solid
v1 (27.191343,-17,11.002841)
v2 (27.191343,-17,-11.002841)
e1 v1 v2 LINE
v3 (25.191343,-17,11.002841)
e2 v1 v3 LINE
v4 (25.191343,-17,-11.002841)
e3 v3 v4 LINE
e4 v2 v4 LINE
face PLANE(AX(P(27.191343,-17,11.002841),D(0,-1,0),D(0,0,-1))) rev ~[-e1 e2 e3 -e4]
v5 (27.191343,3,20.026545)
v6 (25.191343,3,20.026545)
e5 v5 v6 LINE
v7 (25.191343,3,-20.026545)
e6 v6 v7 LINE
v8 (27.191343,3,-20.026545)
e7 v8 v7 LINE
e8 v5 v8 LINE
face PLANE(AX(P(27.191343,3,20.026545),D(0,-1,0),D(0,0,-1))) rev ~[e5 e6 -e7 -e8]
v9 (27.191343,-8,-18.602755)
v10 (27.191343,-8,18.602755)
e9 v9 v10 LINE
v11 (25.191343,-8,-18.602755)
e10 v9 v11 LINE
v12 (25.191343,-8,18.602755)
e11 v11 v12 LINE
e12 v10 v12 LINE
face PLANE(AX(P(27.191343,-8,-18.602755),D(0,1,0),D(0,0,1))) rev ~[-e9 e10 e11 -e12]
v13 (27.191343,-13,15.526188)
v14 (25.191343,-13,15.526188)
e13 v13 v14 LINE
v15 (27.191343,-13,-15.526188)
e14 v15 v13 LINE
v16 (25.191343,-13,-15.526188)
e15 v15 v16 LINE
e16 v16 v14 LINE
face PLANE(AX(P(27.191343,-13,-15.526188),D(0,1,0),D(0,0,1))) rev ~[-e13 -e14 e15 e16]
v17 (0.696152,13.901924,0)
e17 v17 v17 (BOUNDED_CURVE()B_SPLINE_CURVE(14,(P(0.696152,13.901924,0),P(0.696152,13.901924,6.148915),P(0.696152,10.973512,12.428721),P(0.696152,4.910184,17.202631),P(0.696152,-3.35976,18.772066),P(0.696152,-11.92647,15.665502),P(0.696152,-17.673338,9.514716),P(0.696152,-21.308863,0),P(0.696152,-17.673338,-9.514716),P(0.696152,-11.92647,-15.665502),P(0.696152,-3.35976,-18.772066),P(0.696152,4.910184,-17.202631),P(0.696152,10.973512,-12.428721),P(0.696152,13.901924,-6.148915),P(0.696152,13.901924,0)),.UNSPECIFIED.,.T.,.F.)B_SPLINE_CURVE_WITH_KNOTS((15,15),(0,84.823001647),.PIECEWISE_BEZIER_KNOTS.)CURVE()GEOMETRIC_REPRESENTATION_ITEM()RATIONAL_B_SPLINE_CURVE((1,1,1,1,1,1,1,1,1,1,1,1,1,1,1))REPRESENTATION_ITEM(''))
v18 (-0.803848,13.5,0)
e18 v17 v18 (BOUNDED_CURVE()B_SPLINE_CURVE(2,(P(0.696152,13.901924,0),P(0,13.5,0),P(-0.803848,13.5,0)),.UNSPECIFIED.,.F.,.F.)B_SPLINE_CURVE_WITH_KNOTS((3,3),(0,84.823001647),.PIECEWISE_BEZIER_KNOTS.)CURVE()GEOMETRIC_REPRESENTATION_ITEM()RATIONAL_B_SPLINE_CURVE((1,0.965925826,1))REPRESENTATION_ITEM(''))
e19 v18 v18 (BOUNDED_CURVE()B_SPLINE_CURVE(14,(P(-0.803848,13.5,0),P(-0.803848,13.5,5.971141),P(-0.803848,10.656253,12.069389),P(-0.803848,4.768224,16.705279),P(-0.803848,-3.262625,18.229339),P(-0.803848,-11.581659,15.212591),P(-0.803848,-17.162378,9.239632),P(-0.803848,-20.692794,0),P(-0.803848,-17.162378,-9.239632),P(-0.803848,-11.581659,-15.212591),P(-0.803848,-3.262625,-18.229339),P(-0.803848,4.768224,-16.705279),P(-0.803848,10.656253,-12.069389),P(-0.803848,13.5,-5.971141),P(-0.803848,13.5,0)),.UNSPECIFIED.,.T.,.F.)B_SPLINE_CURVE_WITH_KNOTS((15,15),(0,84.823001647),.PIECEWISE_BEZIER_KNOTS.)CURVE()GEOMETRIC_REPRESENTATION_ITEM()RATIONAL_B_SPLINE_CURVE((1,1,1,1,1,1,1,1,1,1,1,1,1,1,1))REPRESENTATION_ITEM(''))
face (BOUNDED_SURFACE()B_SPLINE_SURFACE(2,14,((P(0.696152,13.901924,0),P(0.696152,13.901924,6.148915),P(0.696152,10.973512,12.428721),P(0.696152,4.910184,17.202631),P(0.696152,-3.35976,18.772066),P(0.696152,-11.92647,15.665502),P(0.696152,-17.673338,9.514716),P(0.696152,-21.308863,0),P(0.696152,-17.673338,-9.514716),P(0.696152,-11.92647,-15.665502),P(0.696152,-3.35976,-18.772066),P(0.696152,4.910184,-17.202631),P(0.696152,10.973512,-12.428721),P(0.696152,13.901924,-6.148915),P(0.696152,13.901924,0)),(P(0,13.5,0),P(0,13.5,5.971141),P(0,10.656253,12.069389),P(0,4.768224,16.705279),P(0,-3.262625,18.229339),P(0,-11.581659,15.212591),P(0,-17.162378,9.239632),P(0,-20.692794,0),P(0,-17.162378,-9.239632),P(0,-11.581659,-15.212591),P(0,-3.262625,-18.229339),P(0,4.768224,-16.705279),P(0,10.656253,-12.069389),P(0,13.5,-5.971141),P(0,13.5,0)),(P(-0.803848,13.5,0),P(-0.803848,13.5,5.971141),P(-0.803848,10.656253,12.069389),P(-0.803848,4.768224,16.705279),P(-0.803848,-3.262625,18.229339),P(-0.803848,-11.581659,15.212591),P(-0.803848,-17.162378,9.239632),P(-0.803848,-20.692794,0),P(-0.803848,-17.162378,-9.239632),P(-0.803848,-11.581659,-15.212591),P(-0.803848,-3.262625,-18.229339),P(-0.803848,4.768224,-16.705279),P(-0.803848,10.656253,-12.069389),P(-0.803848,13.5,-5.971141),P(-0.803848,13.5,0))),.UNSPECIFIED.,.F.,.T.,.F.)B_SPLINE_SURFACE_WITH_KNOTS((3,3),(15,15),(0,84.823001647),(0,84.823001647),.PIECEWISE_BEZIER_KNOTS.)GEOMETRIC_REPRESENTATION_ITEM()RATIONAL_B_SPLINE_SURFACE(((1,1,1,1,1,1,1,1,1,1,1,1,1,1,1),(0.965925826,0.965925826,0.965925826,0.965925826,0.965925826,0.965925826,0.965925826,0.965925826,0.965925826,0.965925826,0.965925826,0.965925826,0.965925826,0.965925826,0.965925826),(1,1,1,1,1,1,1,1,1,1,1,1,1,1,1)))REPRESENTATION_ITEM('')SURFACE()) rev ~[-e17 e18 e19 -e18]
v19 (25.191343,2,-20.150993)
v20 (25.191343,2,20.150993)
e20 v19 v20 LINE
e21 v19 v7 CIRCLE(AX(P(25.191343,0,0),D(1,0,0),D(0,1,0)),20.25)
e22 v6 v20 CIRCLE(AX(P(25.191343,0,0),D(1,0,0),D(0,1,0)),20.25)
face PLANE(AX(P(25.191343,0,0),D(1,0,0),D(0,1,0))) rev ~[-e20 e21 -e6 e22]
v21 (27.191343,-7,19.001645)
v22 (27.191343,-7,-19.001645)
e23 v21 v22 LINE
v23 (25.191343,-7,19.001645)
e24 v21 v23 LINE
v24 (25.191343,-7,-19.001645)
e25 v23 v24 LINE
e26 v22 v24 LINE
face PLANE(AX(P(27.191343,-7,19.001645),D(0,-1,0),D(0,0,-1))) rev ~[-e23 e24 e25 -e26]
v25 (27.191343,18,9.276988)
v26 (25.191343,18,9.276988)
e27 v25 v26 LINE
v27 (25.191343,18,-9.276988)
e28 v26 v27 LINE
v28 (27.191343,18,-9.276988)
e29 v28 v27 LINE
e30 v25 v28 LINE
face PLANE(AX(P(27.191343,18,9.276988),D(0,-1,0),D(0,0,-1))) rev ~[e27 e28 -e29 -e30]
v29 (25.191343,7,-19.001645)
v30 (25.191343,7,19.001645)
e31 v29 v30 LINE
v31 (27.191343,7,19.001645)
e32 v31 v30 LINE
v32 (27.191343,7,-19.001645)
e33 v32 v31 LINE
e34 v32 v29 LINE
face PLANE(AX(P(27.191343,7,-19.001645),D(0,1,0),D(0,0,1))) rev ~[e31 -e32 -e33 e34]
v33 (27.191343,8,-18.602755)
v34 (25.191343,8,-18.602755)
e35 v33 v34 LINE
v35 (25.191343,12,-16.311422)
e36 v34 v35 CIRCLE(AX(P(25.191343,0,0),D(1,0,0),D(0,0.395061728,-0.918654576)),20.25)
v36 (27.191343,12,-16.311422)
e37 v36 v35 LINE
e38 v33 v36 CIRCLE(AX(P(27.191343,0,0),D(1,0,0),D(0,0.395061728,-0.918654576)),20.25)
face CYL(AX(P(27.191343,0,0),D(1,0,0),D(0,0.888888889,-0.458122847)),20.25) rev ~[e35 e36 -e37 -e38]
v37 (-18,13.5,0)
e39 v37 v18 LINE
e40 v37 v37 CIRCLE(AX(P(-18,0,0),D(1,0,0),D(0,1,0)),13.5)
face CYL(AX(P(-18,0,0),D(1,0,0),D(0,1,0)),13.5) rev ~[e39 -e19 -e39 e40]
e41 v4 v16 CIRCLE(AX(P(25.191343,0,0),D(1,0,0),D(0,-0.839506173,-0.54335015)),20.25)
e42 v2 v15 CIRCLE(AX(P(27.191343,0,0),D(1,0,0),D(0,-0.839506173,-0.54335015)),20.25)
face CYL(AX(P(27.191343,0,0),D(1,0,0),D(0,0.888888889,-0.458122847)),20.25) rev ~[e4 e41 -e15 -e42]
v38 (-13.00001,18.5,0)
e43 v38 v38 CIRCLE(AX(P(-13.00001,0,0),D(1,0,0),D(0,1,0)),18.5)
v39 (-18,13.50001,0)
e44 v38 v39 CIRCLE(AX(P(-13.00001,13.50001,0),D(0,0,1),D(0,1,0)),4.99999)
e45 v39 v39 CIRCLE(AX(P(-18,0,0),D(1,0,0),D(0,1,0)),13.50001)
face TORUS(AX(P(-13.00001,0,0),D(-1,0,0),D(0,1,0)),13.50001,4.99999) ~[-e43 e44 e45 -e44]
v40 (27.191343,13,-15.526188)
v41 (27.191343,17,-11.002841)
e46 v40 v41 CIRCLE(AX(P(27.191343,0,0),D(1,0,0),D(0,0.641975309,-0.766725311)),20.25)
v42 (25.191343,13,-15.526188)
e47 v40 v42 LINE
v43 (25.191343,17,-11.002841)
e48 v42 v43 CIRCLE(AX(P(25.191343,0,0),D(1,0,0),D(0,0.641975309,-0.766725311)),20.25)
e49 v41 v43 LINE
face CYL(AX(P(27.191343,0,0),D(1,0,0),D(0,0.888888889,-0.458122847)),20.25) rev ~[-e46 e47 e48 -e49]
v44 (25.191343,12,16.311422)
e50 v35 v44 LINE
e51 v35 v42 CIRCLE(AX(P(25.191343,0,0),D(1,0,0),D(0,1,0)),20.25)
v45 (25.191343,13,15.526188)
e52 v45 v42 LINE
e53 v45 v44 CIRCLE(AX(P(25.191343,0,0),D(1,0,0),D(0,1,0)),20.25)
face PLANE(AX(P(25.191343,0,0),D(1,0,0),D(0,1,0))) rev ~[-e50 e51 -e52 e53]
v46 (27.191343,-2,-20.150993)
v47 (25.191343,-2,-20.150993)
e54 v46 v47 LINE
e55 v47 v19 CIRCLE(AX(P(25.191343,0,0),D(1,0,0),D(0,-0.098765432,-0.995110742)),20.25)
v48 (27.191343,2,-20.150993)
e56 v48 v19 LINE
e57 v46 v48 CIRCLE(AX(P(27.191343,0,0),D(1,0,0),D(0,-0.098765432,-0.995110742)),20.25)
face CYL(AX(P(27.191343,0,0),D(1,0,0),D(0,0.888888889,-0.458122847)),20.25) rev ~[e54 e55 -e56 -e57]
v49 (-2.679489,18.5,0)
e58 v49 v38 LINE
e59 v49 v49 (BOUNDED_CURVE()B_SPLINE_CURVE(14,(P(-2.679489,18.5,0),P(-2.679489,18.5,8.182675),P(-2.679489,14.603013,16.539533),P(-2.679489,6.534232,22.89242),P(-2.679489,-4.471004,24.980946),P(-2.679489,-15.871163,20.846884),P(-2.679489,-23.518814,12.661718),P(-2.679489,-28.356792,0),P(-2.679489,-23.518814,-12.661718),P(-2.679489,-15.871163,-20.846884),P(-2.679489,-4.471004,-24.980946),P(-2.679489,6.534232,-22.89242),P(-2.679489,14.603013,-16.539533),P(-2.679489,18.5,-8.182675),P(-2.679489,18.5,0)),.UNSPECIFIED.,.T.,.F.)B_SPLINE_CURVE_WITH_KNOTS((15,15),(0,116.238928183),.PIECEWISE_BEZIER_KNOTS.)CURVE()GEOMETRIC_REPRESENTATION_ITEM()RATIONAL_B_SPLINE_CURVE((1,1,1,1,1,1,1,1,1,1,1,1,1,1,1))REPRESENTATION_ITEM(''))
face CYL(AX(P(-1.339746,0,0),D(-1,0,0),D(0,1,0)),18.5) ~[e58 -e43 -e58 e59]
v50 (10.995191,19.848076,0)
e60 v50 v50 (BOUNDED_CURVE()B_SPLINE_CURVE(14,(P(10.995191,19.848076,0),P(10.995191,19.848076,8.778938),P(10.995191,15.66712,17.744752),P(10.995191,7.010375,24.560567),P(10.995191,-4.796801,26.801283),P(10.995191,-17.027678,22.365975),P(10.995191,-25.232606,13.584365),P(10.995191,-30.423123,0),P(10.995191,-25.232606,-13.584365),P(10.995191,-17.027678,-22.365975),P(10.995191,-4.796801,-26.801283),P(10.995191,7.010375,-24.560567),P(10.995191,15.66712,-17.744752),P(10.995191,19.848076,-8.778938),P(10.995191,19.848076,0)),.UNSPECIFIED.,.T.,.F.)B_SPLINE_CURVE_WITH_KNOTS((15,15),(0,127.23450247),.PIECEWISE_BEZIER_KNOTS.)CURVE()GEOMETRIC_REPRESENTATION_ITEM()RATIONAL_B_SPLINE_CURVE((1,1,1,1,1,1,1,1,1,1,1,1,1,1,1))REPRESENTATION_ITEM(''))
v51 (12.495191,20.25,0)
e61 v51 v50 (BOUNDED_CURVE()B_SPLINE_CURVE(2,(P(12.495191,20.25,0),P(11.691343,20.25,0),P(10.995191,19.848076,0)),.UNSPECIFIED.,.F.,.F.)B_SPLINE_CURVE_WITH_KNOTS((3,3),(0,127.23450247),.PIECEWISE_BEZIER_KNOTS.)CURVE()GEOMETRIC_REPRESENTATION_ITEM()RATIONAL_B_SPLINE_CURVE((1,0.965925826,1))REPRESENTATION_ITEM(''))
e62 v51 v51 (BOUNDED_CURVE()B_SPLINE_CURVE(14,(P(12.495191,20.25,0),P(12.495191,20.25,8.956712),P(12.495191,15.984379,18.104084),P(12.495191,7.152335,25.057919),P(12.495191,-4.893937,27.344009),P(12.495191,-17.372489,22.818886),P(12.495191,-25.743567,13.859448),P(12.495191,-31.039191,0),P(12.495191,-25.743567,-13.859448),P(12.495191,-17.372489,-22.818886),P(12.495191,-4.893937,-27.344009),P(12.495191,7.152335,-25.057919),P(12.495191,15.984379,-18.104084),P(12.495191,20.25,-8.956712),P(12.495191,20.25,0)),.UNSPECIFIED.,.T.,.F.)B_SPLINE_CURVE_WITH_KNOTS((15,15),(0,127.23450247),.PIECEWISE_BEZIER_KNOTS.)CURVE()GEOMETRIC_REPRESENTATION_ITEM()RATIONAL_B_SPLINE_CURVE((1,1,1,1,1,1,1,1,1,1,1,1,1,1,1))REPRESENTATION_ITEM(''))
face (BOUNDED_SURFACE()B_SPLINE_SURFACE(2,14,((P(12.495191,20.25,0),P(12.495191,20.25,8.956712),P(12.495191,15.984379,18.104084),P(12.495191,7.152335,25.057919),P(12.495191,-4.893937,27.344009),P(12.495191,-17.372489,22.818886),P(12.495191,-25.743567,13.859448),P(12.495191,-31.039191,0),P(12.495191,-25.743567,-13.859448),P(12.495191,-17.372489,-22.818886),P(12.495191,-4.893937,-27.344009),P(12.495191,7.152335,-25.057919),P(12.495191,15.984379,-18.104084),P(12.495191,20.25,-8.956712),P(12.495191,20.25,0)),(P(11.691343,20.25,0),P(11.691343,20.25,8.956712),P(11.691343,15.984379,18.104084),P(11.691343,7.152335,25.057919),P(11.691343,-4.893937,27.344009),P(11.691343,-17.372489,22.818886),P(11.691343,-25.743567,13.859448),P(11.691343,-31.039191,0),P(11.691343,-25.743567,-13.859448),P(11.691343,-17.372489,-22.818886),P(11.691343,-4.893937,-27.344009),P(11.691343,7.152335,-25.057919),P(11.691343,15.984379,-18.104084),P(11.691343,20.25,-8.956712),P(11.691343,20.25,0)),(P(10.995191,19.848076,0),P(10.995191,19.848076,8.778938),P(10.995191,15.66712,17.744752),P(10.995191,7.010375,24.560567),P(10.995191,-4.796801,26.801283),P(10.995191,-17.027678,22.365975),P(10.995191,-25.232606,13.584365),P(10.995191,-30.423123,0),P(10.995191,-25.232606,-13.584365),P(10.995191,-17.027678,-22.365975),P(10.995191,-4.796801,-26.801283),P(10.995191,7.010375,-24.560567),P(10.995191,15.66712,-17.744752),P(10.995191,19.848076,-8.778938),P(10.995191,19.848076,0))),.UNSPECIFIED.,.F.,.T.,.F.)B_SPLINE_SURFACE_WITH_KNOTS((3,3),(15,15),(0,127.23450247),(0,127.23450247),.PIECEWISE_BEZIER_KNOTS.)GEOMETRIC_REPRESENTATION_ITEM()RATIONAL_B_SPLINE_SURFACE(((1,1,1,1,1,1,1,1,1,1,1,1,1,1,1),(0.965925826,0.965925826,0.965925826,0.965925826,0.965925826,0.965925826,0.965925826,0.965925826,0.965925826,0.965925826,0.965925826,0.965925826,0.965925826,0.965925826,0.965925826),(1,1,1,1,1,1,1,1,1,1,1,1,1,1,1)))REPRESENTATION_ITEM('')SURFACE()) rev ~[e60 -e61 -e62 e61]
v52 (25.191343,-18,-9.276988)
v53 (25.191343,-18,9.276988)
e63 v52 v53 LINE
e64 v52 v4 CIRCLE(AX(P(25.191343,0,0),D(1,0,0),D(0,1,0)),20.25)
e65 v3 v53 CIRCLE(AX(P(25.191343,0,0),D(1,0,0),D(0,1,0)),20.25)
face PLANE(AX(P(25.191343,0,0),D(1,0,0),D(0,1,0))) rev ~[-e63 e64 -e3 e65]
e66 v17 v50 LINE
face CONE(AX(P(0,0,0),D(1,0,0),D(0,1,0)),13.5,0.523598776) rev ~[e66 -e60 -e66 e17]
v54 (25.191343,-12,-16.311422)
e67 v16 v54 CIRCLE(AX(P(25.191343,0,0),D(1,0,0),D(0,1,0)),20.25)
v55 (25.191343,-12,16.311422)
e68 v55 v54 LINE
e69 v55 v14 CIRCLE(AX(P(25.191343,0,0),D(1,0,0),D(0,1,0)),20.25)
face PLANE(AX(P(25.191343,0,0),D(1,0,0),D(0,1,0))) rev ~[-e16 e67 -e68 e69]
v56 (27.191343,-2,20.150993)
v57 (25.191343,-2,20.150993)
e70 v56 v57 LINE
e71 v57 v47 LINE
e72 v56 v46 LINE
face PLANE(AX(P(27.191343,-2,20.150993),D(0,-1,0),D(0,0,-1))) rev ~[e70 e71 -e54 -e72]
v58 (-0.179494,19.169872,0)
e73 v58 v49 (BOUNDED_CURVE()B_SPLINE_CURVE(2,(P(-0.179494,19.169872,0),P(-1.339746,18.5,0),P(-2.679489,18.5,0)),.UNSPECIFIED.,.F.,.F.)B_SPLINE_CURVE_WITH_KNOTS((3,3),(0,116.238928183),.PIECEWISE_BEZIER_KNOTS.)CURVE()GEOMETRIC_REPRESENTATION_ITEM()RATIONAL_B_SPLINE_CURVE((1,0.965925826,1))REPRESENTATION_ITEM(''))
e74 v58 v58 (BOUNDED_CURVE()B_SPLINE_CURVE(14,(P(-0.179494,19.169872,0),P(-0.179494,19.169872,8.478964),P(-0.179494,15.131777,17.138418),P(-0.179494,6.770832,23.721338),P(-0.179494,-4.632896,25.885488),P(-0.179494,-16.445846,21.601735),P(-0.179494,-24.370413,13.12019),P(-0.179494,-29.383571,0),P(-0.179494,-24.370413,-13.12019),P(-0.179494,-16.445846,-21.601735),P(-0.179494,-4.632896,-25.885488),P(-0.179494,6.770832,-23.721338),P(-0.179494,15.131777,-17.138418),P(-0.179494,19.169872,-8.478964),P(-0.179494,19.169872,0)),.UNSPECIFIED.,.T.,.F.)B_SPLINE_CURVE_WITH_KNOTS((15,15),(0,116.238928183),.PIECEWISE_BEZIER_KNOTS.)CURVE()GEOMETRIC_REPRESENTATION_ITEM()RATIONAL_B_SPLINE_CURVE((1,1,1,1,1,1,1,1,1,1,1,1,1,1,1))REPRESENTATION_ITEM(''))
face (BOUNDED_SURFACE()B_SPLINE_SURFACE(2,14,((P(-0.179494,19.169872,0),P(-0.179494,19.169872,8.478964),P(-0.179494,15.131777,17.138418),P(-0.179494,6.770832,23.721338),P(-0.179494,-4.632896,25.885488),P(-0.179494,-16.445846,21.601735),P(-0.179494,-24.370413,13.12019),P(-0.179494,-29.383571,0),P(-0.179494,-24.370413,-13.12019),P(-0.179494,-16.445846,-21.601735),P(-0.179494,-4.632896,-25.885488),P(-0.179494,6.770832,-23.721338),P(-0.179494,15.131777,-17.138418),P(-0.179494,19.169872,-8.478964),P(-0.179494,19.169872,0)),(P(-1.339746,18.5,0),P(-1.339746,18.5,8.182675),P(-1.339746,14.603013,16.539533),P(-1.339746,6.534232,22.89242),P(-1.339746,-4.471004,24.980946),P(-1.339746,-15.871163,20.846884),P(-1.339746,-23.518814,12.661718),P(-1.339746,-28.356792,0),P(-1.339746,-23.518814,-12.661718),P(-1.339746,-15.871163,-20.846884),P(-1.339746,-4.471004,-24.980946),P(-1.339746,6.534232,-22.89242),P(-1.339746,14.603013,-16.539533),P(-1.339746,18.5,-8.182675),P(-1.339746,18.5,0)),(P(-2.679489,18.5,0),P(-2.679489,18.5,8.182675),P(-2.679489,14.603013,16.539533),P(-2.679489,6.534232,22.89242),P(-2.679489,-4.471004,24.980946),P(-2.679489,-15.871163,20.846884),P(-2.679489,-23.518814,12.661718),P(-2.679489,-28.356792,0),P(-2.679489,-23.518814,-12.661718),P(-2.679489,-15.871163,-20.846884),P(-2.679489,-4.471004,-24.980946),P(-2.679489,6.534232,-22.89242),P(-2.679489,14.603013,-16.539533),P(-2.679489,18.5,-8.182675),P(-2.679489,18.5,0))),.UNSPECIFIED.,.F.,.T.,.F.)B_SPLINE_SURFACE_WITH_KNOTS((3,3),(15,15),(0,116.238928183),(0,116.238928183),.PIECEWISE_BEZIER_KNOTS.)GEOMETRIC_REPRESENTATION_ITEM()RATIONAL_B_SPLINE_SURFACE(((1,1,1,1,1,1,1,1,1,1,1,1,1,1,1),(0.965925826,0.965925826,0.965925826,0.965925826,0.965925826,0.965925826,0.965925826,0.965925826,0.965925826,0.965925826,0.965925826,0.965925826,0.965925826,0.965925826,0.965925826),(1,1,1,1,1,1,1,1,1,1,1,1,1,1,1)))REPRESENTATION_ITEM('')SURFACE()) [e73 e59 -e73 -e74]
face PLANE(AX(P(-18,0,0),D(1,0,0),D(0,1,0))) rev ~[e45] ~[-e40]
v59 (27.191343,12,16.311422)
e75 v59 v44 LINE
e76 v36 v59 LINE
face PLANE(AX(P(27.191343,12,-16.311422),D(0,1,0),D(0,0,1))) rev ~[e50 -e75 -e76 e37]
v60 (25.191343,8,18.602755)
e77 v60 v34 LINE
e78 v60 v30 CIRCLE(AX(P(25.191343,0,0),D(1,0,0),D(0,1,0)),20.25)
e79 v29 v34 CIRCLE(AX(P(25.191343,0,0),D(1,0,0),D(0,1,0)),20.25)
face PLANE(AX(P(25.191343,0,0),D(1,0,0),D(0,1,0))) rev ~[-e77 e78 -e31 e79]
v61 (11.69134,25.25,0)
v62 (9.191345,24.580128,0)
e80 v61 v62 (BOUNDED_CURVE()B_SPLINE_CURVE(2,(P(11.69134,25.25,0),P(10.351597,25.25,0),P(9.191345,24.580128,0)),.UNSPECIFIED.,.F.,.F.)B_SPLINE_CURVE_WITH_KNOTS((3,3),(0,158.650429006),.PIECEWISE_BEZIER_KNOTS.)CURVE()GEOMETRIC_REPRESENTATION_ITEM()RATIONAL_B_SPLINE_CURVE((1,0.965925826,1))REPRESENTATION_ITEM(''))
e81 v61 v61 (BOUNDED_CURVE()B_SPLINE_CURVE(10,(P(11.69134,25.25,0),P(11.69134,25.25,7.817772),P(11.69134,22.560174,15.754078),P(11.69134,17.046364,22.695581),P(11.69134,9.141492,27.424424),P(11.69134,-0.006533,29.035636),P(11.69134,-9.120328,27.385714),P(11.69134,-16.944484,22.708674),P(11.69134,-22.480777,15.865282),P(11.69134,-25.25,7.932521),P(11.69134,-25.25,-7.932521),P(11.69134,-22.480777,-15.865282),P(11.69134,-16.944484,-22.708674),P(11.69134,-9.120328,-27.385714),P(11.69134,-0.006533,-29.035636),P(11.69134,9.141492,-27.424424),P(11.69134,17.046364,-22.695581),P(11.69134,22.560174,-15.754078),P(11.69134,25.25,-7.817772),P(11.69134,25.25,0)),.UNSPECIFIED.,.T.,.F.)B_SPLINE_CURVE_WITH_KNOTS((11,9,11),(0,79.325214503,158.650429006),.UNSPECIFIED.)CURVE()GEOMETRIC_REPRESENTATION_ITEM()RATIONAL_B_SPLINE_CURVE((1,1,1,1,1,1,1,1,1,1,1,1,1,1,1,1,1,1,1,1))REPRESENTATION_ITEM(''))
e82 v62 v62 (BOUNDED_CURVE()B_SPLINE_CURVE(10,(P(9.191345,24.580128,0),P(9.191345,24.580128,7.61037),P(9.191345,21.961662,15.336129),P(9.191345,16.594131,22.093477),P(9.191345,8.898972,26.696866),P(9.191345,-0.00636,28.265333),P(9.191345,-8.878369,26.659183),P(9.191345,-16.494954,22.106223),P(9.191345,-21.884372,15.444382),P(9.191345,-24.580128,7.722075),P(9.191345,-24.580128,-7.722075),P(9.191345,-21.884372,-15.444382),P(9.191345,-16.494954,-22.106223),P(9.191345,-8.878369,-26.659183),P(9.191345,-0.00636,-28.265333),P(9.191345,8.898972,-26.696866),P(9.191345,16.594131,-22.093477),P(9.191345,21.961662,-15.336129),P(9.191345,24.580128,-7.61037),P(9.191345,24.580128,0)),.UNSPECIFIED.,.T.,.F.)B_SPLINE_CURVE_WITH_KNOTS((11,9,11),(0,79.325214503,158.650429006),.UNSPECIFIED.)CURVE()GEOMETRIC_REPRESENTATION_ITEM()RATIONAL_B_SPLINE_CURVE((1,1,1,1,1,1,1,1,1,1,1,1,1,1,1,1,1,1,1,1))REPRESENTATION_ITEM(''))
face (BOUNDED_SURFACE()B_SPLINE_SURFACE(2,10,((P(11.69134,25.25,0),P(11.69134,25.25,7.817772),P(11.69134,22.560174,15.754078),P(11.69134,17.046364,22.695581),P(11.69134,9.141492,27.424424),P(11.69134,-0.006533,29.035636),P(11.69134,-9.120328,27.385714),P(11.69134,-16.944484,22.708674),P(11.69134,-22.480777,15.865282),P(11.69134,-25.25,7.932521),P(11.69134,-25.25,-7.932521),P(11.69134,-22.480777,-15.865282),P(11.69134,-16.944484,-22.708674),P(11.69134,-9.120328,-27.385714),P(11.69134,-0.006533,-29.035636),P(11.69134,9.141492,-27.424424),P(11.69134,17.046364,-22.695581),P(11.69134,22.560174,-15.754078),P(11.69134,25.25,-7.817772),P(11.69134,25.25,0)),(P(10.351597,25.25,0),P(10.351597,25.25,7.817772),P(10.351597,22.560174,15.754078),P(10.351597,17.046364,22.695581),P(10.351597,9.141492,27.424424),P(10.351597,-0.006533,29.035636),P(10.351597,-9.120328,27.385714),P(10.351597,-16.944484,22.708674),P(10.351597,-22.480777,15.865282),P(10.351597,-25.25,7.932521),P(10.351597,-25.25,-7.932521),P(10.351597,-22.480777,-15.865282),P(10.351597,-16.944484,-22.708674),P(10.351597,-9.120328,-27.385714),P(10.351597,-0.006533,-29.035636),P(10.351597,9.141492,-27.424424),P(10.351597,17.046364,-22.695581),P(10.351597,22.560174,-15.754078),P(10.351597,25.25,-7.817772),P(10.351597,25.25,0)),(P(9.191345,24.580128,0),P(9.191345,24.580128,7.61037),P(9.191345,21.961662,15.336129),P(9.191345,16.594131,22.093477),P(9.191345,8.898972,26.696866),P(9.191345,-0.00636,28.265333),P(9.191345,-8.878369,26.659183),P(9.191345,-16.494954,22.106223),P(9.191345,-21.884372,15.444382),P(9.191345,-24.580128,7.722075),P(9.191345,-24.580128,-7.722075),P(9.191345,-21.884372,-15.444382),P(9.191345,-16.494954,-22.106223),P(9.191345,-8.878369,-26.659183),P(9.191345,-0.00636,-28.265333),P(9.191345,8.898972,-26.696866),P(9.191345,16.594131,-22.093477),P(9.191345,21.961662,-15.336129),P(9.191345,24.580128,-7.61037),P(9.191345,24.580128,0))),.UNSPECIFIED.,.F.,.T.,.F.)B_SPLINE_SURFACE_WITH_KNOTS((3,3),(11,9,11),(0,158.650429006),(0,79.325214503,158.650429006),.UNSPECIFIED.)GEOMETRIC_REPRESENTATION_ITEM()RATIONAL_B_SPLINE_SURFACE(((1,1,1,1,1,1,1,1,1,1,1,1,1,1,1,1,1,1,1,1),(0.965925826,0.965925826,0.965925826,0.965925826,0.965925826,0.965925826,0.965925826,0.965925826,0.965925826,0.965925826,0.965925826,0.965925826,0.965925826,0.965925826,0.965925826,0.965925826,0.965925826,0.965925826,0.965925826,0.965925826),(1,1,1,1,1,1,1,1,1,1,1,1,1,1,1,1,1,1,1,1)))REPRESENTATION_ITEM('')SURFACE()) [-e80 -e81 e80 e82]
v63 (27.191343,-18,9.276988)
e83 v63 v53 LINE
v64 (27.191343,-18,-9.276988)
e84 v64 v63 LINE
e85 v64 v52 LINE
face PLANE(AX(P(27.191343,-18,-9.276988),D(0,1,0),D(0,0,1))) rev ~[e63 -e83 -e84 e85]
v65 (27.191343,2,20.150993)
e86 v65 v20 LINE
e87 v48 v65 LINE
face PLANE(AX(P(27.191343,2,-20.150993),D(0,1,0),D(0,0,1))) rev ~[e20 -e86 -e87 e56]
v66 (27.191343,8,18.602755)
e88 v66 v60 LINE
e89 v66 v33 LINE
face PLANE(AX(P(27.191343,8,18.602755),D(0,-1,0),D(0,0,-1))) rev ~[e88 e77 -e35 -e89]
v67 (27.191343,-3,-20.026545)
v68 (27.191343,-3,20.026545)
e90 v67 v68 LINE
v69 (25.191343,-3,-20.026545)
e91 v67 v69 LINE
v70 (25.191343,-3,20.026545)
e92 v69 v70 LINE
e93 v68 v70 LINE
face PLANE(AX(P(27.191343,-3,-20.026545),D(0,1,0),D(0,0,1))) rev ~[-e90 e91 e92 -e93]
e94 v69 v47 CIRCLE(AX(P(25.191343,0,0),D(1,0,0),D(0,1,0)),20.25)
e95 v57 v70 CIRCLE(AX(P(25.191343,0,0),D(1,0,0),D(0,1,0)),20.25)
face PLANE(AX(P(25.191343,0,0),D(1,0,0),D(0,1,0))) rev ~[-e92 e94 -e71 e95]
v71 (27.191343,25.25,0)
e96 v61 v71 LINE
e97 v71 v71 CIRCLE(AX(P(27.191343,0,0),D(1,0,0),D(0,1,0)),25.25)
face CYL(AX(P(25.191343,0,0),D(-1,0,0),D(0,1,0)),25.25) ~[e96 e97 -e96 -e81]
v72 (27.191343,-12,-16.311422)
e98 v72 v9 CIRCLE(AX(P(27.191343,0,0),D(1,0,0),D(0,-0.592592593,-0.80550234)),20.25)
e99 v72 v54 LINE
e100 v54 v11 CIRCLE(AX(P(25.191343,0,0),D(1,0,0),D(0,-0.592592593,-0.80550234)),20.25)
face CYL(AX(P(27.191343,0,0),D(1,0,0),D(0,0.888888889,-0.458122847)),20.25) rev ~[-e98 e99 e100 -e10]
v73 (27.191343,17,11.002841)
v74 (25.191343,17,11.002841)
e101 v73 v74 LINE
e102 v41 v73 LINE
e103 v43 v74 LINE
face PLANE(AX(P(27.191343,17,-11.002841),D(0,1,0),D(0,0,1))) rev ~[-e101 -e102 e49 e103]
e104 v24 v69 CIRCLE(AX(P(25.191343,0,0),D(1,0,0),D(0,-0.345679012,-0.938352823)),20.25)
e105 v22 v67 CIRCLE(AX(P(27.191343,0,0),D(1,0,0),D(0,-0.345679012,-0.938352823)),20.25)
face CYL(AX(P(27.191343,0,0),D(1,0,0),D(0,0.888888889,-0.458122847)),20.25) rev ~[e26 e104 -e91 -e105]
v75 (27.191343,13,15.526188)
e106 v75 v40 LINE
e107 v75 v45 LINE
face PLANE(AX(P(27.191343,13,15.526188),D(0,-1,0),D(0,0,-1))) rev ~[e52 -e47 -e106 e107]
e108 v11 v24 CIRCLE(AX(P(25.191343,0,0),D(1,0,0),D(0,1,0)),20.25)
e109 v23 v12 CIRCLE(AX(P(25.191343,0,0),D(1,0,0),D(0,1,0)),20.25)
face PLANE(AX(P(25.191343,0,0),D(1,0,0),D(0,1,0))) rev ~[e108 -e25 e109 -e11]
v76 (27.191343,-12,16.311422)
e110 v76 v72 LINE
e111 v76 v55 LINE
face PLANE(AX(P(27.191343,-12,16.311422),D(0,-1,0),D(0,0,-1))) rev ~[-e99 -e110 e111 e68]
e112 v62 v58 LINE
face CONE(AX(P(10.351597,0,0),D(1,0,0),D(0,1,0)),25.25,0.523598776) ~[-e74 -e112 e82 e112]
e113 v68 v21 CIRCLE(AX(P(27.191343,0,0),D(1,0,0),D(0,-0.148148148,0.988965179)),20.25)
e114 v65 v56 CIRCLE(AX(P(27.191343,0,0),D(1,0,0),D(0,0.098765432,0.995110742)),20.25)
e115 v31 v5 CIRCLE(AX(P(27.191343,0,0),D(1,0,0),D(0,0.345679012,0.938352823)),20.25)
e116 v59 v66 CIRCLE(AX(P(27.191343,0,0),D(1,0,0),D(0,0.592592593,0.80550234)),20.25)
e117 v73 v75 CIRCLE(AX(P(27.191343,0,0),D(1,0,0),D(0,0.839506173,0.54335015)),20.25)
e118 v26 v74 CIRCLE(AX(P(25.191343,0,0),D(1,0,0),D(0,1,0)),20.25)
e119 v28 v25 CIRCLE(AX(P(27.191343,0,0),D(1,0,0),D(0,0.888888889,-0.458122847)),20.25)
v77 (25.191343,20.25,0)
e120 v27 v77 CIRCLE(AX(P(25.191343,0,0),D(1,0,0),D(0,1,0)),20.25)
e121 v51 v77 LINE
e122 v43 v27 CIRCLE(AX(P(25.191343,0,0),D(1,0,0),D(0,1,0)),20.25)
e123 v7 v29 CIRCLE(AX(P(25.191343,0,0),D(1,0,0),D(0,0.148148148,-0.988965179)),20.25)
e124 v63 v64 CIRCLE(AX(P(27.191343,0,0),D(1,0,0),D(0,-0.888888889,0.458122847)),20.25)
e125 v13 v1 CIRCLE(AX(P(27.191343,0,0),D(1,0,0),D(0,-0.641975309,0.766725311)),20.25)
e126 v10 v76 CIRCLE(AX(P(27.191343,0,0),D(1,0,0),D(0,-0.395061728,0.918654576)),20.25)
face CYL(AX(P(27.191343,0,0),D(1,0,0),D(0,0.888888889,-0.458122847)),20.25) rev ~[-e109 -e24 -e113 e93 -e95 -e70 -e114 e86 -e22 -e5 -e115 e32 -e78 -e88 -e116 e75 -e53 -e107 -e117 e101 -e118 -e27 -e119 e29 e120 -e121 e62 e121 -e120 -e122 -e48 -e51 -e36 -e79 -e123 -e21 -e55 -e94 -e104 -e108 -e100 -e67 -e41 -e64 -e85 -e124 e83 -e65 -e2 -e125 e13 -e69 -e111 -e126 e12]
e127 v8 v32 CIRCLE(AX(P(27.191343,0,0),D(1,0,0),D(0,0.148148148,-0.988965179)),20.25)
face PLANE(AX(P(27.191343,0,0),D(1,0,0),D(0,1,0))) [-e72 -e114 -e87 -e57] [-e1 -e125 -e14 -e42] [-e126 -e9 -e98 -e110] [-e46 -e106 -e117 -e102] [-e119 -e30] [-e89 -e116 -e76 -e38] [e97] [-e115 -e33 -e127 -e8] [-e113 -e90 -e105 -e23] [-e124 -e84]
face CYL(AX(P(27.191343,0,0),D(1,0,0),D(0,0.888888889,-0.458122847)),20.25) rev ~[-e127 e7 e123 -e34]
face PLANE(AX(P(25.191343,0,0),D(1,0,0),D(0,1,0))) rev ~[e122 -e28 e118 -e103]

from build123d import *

# Parameters (mm, degrees)
F2_R     = 25.25
F3_DEPTH = 2
F5_DEPTH = 2
F6_R     = 4.99999
F7_R     = 3


# Not quite as in the source:
# - a fillet or chamfer is up to 0.001 mm smaller than in the source, because OpenCascade refuses the exact size
# - a feature names something its author has since deleted; it is built from what else it names


with BuildPart() as f1:
    # F0 (on Top) → F1 (revolve)
    with BuildSketch(Plane.XY):
        Polygon((-18, 18.5), (-18, 13.5), (0, 13.5), (11.6913429511, 20.25), (25.1913429511, 20.25), (25.1913429511, 25.25), (10.3515969889, 25.25), (-1.3397459622, 18.5), align=None)
    revolve(axis=Axis((-8.7595172226, 0, 0), (1, 0, 0)))

    # F2 (on face) → F3 (join)
    with BuildSketch(Plane.YZ.offset(25.1913429511)):
        Circle(F2_R)
    extrude(amount=F3_DEPTH)

    # F4 (on face) → F5 (cut, through all)
    with BuildSketch(Plane.YZ.offset(27.1913429511)):
        with BuildLine():
            ThreePointArc((17, 11.0028405423), (15.1695473581, 13.4144449363), (13, 15.5261875552))
            Line((13, 15.5261875552), (13, -15.5261875552))
            ThreePointArc((13, -15.5261875552), (15.1695473581, -13.4144449363), (17, -11.0028405423))
            Line((17, -11.0028405423), (17, 11.0028405423))
        make_face()
        with BuildLine():
            ThreePointArc((12, 16.3114223782), (10.0654136275, 17.5712819255), (8, 18.6027551723))
            Line((8, 18.6027551723), (8, -18.6027551723))
            ThreePointArc((8, -18.6027551723), (10.0654136275, -17.5712819255), (12, -16.3114223782))
            Line((12, -16.3114223782), (12, 16.3114223782))
        make_face()
        with BuildLine():
            ThreePointArc((7, 19.0016446657), (5.0261919098, 19.6163170571), (3, 20.0265448842))
            Line((3, 20.0265448842), (3, -20.0265448842))
            ThreePointArc((3, -20.0265448842), (5.0261919098, -19.6163170571), (7, -19.0016446657))
            Line((7, -19.0016446657), (7, 19.0016446657))
        make_face()
        with BuildLine():
            ThreePointArc((2, 20.1509925314), (0, 20.25), (-2, 20.1509925314))
            Line((-2, 20.1509925314), (-2, -20.1509925314))
            ThreePointArc((-2, -20.1509925314), (0, -20.25), (2, -20.1509925314))
            Line((2, -20.1509925314), (2, 20.1509925314))
        make_face()
        with BuildLine():
            Line((-3, -20.0265448842), (-3, 20.0265448842))
            ThreePointArc((-3, 20.0265448842), (-5.0261919098, 19.6163170571), (-7, 19.0016446657))
            Line((-7, 19.0016446657), (-7, -19.0016446657))
            ThreePointArc((-7, -19.0016446657), (-5.0261919098, -19.6163170571), (-3, -20.0265448842))
        make_face()
        with BuildLine():
            Line((-8, -18.6027551723), (-8, 18.6027551723))
            ThreePointArc((-8, 18.6027551723), (-10.0654136275, 17.5712819255), (-12, 16.3114223782))
            Line((-12, 16.3114223782), (-12, -16.3114223782))
            ThreePointArc((-12, -16.3114223782), (-10.0654136275, -17.5712819255), (-8, -18.6027551723))
        make_face()
        with BuildLine():
            Line((-13, -15.5261875552), (-13, 15.5261875552))
            ThreePointArc((-13, 15.5261875552), (-15.1695473581, 13.4144449363), (-17, 11.0028405423))
            Line((-17, 11.0028405423), (-17, -11.0028405423))
            ThreePointArc((-17, -11.0028405423), (-15.1695473581, -13.4144449363), (-13, -15.5261875552))
        make_face()
        with BuildLine():
            Line((-18, -9.2769876576), (-18, 9.2769876576))
            ThreePointArc((-18, 9.2769876576), (-20.25, 0), (-18, -9.2769876576))
        make_face()
        with BuildLine():
            ThreePointArc((20.25, 0), (19.6794626451, 4.772970773), (18, 9.2769876576))
            Line((18, 9.2769876576), (18, -9.2769876576))
            ThreePointArc((18, -9.2769876576), (19.6794626451, -4.772970773), (20.25, 0))
        make_face()
    extrude(amount=-F5_DEPTH, mode=Mode.SUBTRACT)

    # F6 (radius 5 in the source; OpenCascade refuses exactly that, so slightly less here)
    f6_edges = [f1.edges().sort_by_distance(p)[0] for p in [
        (-18, -18.5, 0),
        (-1.339746, -18.5, 0),
        (10.351597, -25.25, 0),
    ]]
    fillet(f6_edges, radius=F6_R)

    # F7
    f7_edges = [f1.edges().sort_by_distance(p)[0] for p in [
        (11.691343, -20.25, 0),
        (0, -13.5, 0),
    ]]
    fillet(f7_edges, radius=F7_R)


solid = f1.part
